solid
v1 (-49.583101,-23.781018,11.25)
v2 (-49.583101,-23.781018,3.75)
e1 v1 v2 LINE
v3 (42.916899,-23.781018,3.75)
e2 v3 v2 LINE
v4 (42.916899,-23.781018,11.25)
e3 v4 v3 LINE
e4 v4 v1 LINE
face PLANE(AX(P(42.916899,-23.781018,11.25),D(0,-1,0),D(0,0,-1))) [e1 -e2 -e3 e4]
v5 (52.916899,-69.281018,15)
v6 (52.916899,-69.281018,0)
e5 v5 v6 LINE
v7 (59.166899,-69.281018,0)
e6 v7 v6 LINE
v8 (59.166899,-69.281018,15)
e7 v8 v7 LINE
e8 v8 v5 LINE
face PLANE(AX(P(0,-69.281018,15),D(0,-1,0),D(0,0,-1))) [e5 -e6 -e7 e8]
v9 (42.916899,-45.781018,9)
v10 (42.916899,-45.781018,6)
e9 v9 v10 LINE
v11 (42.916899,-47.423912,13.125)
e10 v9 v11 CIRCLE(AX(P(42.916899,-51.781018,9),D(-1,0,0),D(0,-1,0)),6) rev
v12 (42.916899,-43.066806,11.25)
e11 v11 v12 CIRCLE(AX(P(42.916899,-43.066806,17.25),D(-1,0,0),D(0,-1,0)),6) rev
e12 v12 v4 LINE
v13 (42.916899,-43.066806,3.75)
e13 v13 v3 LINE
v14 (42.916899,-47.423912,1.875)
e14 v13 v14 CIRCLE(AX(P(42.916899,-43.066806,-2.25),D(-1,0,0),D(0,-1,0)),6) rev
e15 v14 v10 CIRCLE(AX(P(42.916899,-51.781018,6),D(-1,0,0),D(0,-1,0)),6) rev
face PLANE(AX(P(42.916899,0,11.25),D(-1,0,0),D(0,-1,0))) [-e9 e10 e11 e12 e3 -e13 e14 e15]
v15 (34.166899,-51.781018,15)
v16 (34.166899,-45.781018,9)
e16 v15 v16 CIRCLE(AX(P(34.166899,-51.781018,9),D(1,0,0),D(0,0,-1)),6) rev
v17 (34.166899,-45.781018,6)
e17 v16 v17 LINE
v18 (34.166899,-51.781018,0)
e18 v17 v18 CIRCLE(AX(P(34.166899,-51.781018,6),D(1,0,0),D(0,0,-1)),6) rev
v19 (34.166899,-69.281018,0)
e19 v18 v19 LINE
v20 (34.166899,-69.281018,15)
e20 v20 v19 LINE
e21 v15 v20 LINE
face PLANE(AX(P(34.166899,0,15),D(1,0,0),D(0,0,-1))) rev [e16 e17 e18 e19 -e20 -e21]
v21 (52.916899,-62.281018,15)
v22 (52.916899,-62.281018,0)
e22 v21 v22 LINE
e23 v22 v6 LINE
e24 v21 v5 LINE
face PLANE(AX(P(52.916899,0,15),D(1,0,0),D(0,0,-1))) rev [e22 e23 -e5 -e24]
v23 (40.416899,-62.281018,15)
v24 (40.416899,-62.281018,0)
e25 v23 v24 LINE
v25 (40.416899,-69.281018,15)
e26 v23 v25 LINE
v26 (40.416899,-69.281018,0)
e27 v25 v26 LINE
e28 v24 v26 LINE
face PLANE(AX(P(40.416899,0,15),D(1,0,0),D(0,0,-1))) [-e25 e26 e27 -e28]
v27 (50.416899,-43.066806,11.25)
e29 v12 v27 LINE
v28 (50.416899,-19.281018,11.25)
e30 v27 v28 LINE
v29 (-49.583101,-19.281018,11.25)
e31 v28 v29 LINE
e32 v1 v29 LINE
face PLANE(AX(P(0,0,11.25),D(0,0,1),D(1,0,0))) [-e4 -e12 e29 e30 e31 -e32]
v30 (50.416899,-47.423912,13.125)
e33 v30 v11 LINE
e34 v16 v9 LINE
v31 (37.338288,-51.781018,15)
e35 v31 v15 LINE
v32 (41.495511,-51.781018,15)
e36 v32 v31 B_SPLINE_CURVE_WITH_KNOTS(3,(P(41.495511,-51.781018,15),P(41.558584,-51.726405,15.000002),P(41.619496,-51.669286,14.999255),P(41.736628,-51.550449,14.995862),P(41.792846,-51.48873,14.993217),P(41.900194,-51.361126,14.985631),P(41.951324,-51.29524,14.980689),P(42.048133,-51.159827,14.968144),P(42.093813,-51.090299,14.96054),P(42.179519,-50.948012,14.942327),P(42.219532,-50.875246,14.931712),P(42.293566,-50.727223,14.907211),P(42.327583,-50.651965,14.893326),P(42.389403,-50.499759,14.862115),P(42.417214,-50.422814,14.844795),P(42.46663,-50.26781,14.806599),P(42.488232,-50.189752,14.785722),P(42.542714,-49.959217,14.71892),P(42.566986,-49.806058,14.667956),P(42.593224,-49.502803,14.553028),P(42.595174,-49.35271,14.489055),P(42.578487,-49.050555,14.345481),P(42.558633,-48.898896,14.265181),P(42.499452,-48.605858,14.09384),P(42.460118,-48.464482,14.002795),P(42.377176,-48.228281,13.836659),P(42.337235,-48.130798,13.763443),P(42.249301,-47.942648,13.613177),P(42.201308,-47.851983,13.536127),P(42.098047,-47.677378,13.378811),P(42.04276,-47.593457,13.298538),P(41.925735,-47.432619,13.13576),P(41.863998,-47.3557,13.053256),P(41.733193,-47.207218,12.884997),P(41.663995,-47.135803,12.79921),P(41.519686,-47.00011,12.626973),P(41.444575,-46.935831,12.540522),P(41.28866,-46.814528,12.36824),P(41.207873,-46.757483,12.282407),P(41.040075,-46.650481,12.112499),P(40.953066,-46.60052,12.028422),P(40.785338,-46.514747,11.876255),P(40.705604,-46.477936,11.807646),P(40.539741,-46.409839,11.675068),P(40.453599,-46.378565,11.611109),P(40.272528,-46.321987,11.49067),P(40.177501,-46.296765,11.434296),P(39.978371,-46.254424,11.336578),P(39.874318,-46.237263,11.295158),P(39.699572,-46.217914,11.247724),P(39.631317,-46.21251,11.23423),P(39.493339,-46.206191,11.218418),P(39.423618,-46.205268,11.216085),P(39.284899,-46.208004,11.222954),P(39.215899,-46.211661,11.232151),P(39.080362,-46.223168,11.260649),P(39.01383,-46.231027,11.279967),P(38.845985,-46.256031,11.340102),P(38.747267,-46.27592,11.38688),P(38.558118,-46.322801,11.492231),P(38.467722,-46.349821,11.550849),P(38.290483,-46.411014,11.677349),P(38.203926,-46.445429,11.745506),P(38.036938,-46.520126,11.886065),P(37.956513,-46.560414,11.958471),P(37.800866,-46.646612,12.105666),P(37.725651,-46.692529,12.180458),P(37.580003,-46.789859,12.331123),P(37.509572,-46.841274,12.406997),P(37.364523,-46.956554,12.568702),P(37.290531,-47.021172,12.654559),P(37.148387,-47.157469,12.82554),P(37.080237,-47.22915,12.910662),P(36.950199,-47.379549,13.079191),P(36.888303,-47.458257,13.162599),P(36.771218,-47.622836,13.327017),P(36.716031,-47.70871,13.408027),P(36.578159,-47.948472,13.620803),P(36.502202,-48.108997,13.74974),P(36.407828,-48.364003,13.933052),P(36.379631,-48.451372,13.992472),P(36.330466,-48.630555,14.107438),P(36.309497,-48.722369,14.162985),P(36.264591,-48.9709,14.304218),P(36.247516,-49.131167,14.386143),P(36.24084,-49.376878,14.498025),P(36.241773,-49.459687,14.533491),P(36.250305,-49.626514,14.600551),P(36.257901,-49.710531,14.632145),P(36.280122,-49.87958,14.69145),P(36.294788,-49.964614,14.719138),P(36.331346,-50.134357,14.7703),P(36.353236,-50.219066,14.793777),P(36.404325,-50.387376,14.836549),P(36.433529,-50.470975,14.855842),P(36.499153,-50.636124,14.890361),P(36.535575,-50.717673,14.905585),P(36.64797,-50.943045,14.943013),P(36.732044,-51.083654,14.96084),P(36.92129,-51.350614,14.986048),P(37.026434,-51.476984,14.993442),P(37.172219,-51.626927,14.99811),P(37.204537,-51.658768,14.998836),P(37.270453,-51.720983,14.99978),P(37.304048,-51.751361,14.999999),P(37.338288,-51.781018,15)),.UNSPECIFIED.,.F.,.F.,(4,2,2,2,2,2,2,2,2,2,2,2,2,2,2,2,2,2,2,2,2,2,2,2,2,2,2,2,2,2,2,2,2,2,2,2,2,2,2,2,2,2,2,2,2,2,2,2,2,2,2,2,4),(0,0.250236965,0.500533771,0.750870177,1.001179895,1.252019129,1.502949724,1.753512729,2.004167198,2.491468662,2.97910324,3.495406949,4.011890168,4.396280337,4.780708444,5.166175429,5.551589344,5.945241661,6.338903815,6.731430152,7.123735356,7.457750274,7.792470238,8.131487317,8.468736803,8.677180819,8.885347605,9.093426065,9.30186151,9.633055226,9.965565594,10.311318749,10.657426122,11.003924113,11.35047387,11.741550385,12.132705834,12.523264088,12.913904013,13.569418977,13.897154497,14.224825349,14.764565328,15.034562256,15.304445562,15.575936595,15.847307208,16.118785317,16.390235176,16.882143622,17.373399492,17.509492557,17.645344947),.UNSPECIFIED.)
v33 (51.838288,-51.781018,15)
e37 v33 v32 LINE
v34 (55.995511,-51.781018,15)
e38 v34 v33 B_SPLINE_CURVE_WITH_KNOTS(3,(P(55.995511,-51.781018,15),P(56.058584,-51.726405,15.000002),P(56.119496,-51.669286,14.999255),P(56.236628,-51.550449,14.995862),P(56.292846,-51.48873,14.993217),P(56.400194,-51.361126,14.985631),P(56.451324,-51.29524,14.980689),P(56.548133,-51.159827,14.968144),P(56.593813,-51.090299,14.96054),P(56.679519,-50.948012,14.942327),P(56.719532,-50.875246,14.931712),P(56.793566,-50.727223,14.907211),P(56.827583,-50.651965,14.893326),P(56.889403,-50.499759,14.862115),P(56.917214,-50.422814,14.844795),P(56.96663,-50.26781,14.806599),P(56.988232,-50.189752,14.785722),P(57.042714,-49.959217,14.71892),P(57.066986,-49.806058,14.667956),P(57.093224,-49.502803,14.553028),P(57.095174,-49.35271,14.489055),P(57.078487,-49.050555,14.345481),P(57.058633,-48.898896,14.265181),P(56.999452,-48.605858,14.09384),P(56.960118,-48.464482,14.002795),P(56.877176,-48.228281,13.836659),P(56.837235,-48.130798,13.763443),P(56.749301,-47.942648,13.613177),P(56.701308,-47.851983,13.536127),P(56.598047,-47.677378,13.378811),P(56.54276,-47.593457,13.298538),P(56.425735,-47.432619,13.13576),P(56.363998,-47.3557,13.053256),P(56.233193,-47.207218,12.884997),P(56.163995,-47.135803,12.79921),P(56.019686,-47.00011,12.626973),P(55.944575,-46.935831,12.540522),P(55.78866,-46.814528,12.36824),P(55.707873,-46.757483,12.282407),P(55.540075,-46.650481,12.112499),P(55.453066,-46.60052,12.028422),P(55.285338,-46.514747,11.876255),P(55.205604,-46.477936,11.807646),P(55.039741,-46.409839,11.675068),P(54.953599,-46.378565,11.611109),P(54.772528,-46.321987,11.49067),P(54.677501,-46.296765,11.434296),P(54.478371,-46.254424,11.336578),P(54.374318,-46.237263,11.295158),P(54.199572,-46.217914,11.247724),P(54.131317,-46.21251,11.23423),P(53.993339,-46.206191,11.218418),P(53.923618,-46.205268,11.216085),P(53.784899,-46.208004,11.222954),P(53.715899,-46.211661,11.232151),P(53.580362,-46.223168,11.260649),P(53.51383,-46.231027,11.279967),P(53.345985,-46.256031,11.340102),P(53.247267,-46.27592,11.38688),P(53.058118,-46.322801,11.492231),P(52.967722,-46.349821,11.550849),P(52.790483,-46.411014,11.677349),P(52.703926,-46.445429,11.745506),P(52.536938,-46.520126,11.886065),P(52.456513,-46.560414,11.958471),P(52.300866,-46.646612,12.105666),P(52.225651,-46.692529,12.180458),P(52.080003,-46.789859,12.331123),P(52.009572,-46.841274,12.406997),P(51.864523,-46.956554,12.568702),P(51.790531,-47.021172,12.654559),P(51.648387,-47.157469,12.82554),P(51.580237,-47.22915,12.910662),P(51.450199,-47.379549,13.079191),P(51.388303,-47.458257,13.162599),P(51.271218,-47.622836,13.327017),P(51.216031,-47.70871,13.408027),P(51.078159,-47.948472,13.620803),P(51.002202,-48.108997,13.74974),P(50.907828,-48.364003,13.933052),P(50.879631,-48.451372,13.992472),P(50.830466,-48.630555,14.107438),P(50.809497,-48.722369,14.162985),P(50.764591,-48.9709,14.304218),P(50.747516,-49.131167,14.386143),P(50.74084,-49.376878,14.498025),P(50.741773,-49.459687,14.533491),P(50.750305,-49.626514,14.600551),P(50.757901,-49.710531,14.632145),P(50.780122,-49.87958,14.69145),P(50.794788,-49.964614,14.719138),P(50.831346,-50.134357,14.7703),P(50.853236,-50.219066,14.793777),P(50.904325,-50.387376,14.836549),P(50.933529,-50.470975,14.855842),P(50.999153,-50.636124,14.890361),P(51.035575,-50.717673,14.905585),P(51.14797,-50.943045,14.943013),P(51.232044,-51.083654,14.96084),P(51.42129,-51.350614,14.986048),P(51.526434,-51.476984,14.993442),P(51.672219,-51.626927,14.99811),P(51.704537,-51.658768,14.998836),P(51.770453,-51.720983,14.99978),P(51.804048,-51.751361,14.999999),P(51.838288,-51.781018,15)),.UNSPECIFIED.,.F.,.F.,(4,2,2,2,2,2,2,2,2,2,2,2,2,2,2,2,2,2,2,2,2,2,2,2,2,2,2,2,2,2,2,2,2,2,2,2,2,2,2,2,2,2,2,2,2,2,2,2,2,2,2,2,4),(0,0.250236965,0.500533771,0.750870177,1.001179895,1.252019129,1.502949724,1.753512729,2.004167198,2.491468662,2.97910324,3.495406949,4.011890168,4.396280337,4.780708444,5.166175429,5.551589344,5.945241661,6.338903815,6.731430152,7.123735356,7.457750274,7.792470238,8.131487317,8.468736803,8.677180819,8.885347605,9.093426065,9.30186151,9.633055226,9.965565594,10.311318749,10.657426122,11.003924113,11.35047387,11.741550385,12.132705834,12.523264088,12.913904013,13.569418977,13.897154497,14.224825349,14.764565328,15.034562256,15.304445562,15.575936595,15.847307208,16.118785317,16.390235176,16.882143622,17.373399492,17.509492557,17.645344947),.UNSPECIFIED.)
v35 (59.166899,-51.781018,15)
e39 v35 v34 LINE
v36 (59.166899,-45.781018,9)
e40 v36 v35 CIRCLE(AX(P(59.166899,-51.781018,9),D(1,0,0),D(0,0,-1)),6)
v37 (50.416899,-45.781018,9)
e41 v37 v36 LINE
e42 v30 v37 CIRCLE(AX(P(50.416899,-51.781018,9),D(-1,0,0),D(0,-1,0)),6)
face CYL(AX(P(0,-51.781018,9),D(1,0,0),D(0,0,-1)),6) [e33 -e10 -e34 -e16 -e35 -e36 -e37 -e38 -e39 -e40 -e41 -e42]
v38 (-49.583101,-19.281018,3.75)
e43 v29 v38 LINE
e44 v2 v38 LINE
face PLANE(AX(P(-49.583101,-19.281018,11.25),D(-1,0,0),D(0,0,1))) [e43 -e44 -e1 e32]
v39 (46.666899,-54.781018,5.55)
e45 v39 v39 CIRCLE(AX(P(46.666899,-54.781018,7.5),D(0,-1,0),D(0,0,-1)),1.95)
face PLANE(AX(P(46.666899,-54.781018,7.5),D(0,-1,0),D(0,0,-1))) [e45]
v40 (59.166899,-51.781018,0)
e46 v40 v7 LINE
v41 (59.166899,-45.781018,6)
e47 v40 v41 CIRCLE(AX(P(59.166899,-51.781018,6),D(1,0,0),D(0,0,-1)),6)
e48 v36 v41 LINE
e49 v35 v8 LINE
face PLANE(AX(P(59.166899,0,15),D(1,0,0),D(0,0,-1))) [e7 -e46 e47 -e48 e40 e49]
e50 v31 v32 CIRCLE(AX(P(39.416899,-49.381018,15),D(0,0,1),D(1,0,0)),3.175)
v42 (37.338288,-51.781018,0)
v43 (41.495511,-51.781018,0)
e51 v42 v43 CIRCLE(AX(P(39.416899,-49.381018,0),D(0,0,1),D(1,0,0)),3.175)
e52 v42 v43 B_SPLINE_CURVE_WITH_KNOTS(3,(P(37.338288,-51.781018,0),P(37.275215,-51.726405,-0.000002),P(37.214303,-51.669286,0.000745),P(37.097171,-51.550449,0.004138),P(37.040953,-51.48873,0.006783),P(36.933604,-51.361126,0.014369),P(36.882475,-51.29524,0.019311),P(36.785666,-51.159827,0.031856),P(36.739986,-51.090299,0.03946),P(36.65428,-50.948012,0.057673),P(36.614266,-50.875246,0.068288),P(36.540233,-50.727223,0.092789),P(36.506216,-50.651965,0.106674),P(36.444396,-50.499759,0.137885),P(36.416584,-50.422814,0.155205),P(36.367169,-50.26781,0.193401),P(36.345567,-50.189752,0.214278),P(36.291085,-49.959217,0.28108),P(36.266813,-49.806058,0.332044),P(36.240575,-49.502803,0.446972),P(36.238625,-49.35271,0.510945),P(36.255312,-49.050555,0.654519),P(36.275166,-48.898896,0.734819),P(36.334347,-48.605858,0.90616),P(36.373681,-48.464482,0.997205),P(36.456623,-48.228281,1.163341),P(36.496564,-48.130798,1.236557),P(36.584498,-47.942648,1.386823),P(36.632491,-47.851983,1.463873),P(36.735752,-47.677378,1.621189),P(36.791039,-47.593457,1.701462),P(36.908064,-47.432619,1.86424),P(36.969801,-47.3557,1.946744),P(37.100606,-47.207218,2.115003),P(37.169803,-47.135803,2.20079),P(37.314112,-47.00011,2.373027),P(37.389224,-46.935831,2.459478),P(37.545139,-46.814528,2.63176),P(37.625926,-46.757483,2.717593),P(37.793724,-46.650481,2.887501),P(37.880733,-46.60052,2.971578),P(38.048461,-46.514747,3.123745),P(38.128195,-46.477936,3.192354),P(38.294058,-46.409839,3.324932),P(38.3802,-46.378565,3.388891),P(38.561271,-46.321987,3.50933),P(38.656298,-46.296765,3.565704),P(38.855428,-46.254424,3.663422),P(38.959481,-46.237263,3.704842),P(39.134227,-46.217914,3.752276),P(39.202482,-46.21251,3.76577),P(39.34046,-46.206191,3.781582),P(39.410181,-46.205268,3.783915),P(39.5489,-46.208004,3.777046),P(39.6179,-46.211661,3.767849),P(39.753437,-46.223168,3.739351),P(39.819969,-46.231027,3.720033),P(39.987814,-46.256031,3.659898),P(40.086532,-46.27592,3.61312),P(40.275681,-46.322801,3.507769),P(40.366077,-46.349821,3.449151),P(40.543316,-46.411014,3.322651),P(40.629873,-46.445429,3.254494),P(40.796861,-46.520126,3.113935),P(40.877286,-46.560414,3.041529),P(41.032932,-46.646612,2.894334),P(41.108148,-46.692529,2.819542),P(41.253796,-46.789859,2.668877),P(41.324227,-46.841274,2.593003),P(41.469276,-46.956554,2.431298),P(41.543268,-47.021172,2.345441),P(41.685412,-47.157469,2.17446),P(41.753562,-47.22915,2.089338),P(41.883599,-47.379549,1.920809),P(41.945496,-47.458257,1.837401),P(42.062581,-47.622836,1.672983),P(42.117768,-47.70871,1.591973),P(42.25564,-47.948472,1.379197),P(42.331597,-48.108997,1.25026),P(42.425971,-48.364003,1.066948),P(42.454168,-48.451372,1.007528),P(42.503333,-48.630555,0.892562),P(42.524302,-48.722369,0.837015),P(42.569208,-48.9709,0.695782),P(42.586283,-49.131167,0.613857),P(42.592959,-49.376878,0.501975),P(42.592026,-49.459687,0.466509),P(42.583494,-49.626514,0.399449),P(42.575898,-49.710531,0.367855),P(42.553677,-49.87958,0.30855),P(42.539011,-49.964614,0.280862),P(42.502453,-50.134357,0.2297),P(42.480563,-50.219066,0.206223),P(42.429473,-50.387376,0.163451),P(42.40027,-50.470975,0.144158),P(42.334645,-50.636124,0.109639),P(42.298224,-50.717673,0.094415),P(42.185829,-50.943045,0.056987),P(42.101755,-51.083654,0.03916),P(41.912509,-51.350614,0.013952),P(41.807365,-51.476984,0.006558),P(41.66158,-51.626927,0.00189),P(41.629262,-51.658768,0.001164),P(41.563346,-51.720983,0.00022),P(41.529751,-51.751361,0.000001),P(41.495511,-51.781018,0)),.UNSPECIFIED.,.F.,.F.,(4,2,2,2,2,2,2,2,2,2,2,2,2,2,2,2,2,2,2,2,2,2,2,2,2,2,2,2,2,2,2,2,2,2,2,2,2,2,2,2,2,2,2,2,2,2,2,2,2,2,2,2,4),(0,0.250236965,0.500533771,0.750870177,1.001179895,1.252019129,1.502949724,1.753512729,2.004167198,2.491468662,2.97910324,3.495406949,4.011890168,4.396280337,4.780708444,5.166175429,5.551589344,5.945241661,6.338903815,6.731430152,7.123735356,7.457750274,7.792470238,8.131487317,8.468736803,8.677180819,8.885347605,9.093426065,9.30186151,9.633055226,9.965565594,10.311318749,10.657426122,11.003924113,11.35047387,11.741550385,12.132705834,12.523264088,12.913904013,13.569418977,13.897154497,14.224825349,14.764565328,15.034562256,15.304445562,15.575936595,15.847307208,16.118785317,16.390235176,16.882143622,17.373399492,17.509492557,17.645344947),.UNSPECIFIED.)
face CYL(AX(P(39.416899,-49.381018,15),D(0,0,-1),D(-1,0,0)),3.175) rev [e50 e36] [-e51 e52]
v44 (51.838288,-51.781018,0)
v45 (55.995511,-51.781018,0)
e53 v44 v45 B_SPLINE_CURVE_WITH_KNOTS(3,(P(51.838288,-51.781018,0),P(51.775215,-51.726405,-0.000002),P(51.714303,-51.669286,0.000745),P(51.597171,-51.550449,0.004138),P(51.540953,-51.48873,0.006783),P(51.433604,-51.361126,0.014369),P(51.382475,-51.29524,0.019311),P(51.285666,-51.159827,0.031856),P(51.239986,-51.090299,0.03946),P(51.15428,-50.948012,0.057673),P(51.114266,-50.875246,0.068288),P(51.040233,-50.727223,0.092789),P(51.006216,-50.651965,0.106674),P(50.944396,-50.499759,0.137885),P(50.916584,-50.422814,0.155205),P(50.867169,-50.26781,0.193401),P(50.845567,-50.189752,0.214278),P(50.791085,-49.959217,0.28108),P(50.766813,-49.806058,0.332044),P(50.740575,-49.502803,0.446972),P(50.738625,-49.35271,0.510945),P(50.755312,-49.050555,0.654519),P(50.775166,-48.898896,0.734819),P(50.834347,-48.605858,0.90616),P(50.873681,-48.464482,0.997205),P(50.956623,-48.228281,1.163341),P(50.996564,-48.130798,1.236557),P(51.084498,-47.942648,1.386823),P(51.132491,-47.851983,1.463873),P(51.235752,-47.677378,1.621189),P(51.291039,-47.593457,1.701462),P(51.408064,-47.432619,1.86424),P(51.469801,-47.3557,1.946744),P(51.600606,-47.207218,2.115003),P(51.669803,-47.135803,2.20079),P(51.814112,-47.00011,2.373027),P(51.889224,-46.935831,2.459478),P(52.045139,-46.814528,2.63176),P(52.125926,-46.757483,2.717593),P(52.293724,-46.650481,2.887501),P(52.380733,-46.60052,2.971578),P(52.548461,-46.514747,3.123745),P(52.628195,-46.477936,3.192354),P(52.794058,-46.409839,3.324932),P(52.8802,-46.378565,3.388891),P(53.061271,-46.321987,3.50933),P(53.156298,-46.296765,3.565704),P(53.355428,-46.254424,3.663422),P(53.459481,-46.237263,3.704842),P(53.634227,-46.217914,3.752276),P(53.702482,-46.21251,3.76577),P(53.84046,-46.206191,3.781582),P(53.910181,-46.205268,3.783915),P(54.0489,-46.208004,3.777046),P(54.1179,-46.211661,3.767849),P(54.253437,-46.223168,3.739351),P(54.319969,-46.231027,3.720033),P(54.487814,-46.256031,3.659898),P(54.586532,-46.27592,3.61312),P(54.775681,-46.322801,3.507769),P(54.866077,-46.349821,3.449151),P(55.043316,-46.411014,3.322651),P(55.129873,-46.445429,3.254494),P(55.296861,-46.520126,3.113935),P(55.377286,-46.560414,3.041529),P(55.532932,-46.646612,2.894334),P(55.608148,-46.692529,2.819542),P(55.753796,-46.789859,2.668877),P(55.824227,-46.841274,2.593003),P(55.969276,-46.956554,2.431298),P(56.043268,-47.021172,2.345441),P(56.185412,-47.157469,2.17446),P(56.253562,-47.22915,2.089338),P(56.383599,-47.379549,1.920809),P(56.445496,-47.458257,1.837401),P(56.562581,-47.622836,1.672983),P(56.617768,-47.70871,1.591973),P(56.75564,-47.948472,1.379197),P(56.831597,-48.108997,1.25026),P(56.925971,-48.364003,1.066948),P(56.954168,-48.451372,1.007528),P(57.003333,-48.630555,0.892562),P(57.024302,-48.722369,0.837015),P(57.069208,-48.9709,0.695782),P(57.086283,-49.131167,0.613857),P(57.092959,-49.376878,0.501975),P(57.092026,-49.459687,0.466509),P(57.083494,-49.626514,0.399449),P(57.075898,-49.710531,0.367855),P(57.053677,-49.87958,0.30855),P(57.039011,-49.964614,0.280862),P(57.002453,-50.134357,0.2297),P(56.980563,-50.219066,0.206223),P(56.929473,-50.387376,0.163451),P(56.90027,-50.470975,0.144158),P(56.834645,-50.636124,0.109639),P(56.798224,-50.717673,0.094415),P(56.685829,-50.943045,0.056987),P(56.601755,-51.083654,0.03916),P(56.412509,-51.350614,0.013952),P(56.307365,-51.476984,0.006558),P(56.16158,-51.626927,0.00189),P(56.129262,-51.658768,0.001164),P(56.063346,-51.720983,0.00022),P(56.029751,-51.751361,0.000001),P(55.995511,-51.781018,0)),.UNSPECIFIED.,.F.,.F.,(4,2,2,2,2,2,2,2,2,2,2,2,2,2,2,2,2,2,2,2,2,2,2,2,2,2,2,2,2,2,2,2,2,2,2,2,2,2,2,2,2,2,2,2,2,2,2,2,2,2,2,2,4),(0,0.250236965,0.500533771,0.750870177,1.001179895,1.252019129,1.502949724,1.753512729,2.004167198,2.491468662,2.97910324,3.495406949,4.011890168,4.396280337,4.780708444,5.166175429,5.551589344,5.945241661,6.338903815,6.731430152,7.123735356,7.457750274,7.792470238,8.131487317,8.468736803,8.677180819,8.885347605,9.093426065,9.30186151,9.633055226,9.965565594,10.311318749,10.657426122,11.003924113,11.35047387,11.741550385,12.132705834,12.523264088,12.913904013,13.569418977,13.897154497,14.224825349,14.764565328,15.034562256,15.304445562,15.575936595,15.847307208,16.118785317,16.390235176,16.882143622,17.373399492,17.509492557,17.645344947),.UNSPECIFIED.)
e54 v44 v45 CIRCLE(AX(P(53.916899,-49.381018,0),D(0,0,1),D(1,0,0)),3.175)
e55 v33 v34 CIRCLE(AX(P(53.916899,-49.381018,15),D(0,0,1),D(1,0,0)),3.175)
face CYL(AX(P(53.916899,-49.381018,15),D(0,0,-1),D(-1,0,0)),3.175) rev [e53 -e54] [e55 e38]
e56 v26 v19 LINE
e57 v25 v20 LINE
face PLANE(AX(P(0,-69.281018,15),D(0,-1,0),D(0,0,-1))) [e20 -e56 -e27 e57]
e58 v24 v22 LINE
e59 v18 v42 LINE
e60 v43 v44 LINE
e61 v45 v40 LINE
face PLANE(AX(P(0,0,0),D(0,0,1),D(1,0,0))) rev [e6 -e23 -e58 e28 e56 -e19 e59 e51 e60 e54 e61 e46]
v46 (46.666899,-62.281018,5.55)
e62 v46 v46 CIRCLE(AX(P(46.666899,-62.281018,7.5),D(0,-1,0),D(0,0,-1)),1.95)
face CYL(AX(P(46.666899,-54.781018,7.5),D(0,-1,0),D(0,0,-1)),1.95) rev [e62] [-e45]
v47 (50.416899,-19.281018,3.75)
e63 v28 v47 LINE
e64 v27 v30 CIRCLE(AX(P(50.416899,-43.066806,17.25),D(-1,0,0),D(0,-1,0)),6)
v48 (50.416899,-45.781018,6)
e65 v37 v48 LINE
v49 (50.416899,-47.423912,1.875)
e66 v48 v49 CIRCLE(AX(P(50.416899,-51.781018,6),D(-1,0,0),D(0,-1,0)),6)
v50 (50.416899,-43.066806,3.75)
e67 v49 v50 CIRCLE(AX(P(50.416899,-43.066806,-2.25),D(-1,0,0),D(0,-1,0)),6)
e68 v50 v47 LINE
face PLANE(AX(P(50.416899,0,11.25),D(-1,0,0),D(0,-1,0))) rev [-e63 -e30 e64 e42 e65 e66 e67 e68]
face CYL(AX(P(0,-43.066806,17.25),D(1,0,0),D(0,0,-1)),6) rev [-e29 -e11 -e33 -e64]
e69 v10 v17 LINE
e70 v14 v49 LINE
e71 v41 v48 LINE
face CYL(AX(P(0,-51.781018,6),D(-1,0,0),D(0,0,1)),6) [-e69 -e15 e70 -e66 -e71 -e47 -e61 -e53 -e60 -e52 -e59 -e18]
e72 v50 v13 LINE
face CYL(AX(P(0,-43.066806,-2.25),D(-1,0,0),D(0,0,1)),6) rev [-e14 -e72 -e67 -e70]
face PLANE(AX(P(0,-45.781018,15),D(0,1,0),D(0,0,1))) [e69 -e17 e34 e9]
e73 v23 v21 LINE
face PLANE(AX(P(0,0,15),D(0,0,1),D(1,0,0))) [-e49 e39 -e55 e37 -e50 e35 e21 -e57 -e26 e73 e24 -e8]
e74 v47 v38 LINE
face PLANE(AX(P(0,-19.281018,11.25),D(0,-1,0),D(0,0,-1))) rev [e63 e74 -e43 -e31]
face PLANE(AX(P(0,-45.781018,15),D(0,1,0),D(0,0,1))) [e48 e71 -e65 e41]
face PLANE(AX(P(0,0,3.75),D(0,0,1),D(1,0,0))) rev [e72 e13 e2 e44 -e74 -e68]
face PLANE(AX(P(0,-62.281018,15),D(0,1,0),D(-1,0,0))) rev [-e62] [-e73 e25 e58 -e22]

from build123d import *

# Parameters (mm, degrees)
SKETCH1_R           = 3.175
PUSHER_BASE_DEPTH   = 15
SKETCH3_R           = 1.95
SCREW_HOLE_DEPTH    = 7.5
SKETCH6_W           = 7.5
SKETCH6_H           = 26.5
PUSHER_HEAD_DEPTH   = 3.75
FILLET1_R           = 6
FILLET5_R           = 6
FILLET6_R           = 6
SKETCH8_W           = 92.5
SKETCH8_H           = 4.5
BOSS_EXTRUDE1_DEPTH = 7.5


with BuildPart() as part:
    # Sketch1 → pusher base (new body)
    with BuildSketch(Plane.XY):
        Polygon((59.166899441, -45.781018283), (51.666899441, -45.781018283), (41.666899441, -45.781018283), (34.166899441, -45.781018283), (34.166899441, -69.281018283), (40.416899441, -69.281018283), (40.416899441, -62.281018283), (52.916899441, -62.281018283), (52.916899441, -69.281018283), (59.166899441, -69.281018283), align=None)
        with Locations((39.416899441, -49.381018283)):
            Circle(SKETCH1_R, mode=Mode.SUBTRACT)
        with Locations((53.916899441, -49.381018283)):
            Circle(SKETCH1_R, mode=Mode.SUBTRACT)
    extrude(amount=PUSHER_BASE_DEPTH)

    # Sketch3 → screw hole (cut)
    with BuildSketch(Plane.XZ.offset(62.281018283)):
        with Locations(Location((46.666899441, 7.5, 0), (0, 0, 270))):
            Circle(SKETCH3_R)
    extrude(amount=-SCREW_HOLE_DEPTH, mode=Mode.SUBTRACT)

    # Sketch6 → pusher head (add, symmetric)
    with BuildSketch(Plane.XY.offset(7.5)):
        with Locations((46.666899441, -32.531018283)):
            Rectangle(SKETCH6_W, SKETCH6_H)
    extrude(amount=PUSHER_HEAD_DEPTH, both=True)

    # Fillet1
    # the kernel refuses this fillet: 6 mm, written as the material it takes off along each edge
    with BuildSketch(Plane(origin=(74.166899441, -45.781018283, 0), x_dir=(0, 0, 1), z_dir=(-1, 0, 0))) as fillet1_piece_1_section:
        with BuildLine():
            CenterArc((FILLET1_R, -FILLET1_R), FILLET1_R, 90, 90)
            Line((0, -FILLET1_R), (0, 0))
            Line((0, 0), (FILLET1_R, 0))
        make_face()
    fillet1_piece_1 = extrude(amount=55, mode=Mode.PRIVATE)
    fillet1_piece_1 = split(fillet1_piece_1, bisect_by=Plane(origin=(62.291899441, -45.824840722, 3.75), z_dir=(0, 0, 1)), keep=Keep.TOP, mode=Mode.PRIVATE)
    fillet1_piece_1 = split(fillet1_piece_1, bisect_by=Plane(origin=(50.416899441, -45.824840722, 4.566140917), z_dir=(1, 0, 0)), keep=Keep.TOP, mode=Mode.PRIVATE)
    add(fillet1_piece_1, mode=Mode.SUBTRACT)
    with BuildSketch(Plane(origin=(74.166899441, -45.781018283, 0), x_dir=(0, 0, 1), z_dir=(-1, 0, 0))) as fillet1_piece_2_section:
        with BuildLine():
            CenterArc((FILLET1_R, -FILLET1_R), FILLET1_R, 90, 90)
            Line((0, -FILLET1_R), (0, 0))
            Line((0, 0), (FILLET1_R, 0))
        make_face()
    fillet1_piece_2 = extrude(amount=55, mode=Mode.PRIVATE)
    fillet1_piece_2 = split(fillet1_piece_2, bisect_by=Plane(origin=(62.291899441, -47.230240291, 3.75), z_dir=(0, 0, -1)), keep=Keep.TOP, mode=Mode.PRIVATE)
    fillet1_piece_2 = split(fillet1_piece_2, bisect_by=Plane(origin=(50.416899441, -47.230240291, 1.136674626), z_dir=(1, 0, 0)), keep=Keep.TOP, mode=Mode.PRIVATE)
    add(fillet1_piece_2, mode=Mode.SUBTRACT)
    with BuildSketch(Plane(origin=(74.166899441, -45.781018283, 0), x_dir=(0, 0, 1), z_dir=(-1, 0, 0))) as fillet1_piece_3_section:
        with BuildLine():
            CenterArc((FILLET1_R, -FILLET1_R), FILLET1_R, 90, 90)
            Line((0, -FILLET1_R), (0, 0))
            Line((0, 0), (FILLET1_R, 0))
        make_face()
    fillet1_piece_3 = extrude(amount=55, mode=Mode.PRIVATE)
    fillet1_piece_3 = split(fillet1_piece_3, bisect_by=Plane(origin=(46.666899441, -47.230240291, 3.75), z_dir=(0, 0, -1)), keep=Keep.TOP, mode=Mode.PRIVATE)
    fillet1_piece_3 = split(fillet1_piece_3, bisect_by=Plane(origin=(50.416899441, -47.230240291, 1.136674626), z_dir=(-1, 0, 0)), keep=Keep.TOP, mode=Mode.PRIVATE)
    fillet1_piece_3 = split(fillet1_piece_3, bisect_by=Plane(origin=(42.916899441, -47.230240291, 1.136674626), z_dir=(1, 0, 0)), keep=Keep.TOP, mode=Mode.PRIVATE)
    add(fillet1_piece_3, mode=Mode.SUBTRACT)
    with BuildSketch(Plane(origin=(74.166899441, -45.781018283, 0), x_dir=(0, 0, 1), z_dir=(-1, 0, 0))) as fillet1_piece_4_section:
        with BuildLine():
            CenterArc((FILLET1_R, -FILLET1_R), FILLET1_R, 90, 90)
            Line((0, -FILLET1_R), (0, 0))
            Line((0, 0), (FILLET1_R, 0))
        make_face()
    fillet1_piece_4 = extrude(amount=55, mode=Mode.PRIVATE)
    fillet1_piece_4 = split(fillet1_piece_4, bisect_by=Plane(origin=(31.041899441, -45.824840722, 3.75), z_dir=(0, 0, 1)), keep=Keep.TOP, mode=Mode.PRIVATE)
    fillet1_piece_4 = split(fillet1_piece_4, bisect_by=Plane(origin=(42.916899441, -45.824840722, 4.566140917), z_dir=(-1, 0, 0)), keep=Keep.TOP, mode=Mode.PRIVATE)
    add(fillet1_piece_4, mode=Mode.SUBTRACT)
    with BuildSketch(Plane(origin=(74.166899441, -45.781018283, 0), x_dir=(0, 0, 1), z_dir=(-1, 0, 0))) as fillet1_piece_5_section:
        with BuildLine():
            CenterArc((FILLET1_R, -FILLET1_R), FILLET1_R, 90, 90)
            Line((0, -FILLET1_R), (0, 0))
            Line((0, 0), (FILLET1_R, 0))
        make_face()
    fillet1_piece_5 = extrude(amount=55, mode=Mode.PRIVATE)
    fillet1_piece_5 = split(fillet1_piece_5, bisect_by=Plane(origin=(31.041899441, -47.230240291, 3.75), z_dir=(0, 0, -1)), keep=Keep.TOP, mode=Mode.PRIVATE)
    fillet1_piece_5 = split(fillet1_piece_5, bisect_by=Plane(origin=(42.916899441, -47.230240291, 1.136674626), z_dir=(-1, 0, 0)), keep=Keep.TOP, mode=Mode.PRIVATE)
    add(fillet1_piece_5, mode=Mode.SUBTRACT)
    with BuildSketch(Plane(origin=(19.166899441, -45.781018283, 15), x_dir=(0, 0, -1), z_dir=(1, 0, 0))) as fillet1_piece_6_section:
        with BuildLine():
            CenterArc((FILLET1_R, -FILLET1_R), FILLET1_R, 90, 90)
            Line((0, -FILLET1_R), (0, 0))
            Line((0, 0), (FILLET1_R, 0))
        make_face()
    fillet1_piece_6 = extrude(amount=55, mode=Mode.PRIVATE)
    fillet1_piece_6 = split(fillet1_piece_6, bisect_by=Plane(origin=(31.041899441, -45.824840722, 11.25), z_dir=(0, 0, -1)), keep=Keep.TOP, mode=Mode.PRIVATE)
    fillet1_piece_6 = split(fillet1_piece_6, bisect_by=Plane(origin=(42.916899441, -45.824840722, 10.433859083), z_dir=(-1, 0, 0)), keep=Keep.TOP, mode=Mode.PRIVATE)
    add(fillet1_piece_6, mode=Mode.SUBTRACT)
    with BuildSketch(Plane(origin=(19.166899441, -45.781018283, 15), x_dir=(0, 0, -1), z_dir=(1, 0, 0))) as fillet1_piece_7_section:
        with BuildLine():
            CenterArc((FILLET1_R, -FILLET1_R), FILLET1_R, 90, 90)
            Line((0, -FILLET1_R), (0, 0))
            Line((0, 0), (FILLET1_R, 0))
        make_face()
    fillet1_piece_7 = extrude(amount=55, mode=Mode.PRIVATE)
    fillet1_piece_7 = split(fillet1_piece_7, bisect_by=Plane(origin=(31.041899441, -47.230240291, 11.25), z_dir=(0, 0, 1)), keep=Keep.TOP, mode=Mode.PRIVATE)
    fillet1_piece_7 = split(fillet1_piece_7, bisect_by=Plane(origin=(42.916899441, -47.230240291, 13.863325374), z_dir=(-1, 0, 0)), keep=Keep.TOP, mode=Mode.PRIVATE)
    add(fillet1_piece_7, mode=Mode.SUBTRACT)
    with BuildSketch(Plane(origin=(19.166899441, -45.781018283, 15), x_dir=(0, 0, -1), z_dir=(1, 0, 0))) as fillet1_piece_8_section:
        with BuildLine():
            CenterArc((FILLET1_R, -FILLET1_R), FILLET1_R, 90, 90)
            Line((0, -FILLET1_R), (0, 0))
            Line((0, 0), (FILLET1_R, 0))
        make_face()
    fillet1_piece_8 = extrude(amount=55, mode=Mode.PRIVATE)
    fillet1_piece_8 = split(fillet1_piece_8, bisect_by=Plane(origin=(50.416899441, -47.230240291, 13.863325374), z_dir=(-1, 0, 0)), keep=Keep.TOP, mode=Mode.PRIVATE)
    fillet1_piece_8 = split(fillet1_piece_8, bisect_by=Plane(origin=(46.666899441, -47.230240291, 11.25), z_dir=(0, 0, 1)), keep=Keep.TOP, mode=Mode.PRIVATE)
    fillet1_piece_8 = split(fillet1_piece_8, bisect_by=Plane(origin=(42.916899441, -47.230240291, 13.863325374), z_dir=(1, 0, 0)), keep=Keep.TOP, mode=Mode.PRIVATE)
    add(fillet1_piece_8, mode=Mode.SUBTRACT)
    with BuildSketch(Plane(origin=(19.166899441, -45.781018283, 15), x_dir=(0, 0, -1), z_dir=(1, 0, 0))) as fillet1_piece_9_section:
        with BuildLine():
            CenterArc((FILLET1_R, -FILLET1_R), FILLET1_R, 90, 90)
            Line((0, -FILLET1_R), (0, 0))
            Line((0, 0), (FILLET1_R, 0))
        make_face()
    fillet1_piece_9 = extrude(amount=55, mode=Mode.PRIVATE)
    fillet1_piece_9 = split(fillet1_piece_9, bisect_by=Plane(origin=(50.416899441, -45.824840722, 10.433859083), z_dir=(1, 0, 0)), keep=Keep.TOP, mode=Mode.PRIVATE)
    fillet1_piece_9 = split(fillet1_piece_9, bisect_by=Plane(origin=(62.291899441, -45.824840722, 11.25), z_dir=(0, 0, -1)), keep=Keep.TOP, mode=Mode.PRIVATE)
    add(fillet1_piece_9, mode=Mode.SUBTRACT)
    with BuildSketch(Plane(origin=(19.166899441, -45.781018283, 15), x_dir=(0, 0, -1), z_dir=(1, 0, 0))) as fillet1_piece_10_section:
        with BuildLine():
            CenterArc((FILLET1_R, -FILLET1_R), FILLET1_R, 90, 90)
            Line((0, -FILLET1_R), (0, 0))
            Line((0, 0), (FILLET1_R, 0))
        make_face()
    fillet1_piece_10 = extrude(amount=55, mode=Mode.PRIVATE)
    fillet1_piece_10 = split(fillet1_piece_10, bisect_by=Plane(origin=(50.416899441, -47.230240291, 13.863325374), z_dir=(1, 0, 0)), keep=Keep.TOP, mode=Mode.PRIVATE)
    fillet1_piece_10 = split(fillet1_piece_10, bisect_by=Plane(origin=(62.291899441, -47.230240291, 11.25), z_dir=(0, 0, 1)), keep=Keep.TOP, mode=Mode.PRIVATE)
    add(fillet1_piece_10, mode=Mode.SUBTRACT)

    # Fillet5
    fillet5_edges = [part.edges().sort_by_distance(p)[0] for p in [
        (46.666899441, -46.218869418, 11.25),
    ]]
    fillet(fillet5_edges, radius=FILLET5_R)

    # Fillet6
    fillet6_edges = [part.edges().sort_by_distance(p)[0] for p in [
        (46.666899441, -46.218869418, 3.75),
    ]]
    fillet(fillet6_edges, radius=FILLET6_R)

    # Sketch8 → Boss-Extrude1 (add)
    with BuildSketch(Plane(origin=(0, 0, 3.75), x_dir=(-1, 0, 0), z_dir=(0, 0, -1))):
        with Locations((3.333100559, -21.531018283)):
            Rectangle(SKETCH8_W, SKETCH8_H)
    extrude(amount=-BOSS_EXTRUDE1_DEPTH)


solid = part.part
